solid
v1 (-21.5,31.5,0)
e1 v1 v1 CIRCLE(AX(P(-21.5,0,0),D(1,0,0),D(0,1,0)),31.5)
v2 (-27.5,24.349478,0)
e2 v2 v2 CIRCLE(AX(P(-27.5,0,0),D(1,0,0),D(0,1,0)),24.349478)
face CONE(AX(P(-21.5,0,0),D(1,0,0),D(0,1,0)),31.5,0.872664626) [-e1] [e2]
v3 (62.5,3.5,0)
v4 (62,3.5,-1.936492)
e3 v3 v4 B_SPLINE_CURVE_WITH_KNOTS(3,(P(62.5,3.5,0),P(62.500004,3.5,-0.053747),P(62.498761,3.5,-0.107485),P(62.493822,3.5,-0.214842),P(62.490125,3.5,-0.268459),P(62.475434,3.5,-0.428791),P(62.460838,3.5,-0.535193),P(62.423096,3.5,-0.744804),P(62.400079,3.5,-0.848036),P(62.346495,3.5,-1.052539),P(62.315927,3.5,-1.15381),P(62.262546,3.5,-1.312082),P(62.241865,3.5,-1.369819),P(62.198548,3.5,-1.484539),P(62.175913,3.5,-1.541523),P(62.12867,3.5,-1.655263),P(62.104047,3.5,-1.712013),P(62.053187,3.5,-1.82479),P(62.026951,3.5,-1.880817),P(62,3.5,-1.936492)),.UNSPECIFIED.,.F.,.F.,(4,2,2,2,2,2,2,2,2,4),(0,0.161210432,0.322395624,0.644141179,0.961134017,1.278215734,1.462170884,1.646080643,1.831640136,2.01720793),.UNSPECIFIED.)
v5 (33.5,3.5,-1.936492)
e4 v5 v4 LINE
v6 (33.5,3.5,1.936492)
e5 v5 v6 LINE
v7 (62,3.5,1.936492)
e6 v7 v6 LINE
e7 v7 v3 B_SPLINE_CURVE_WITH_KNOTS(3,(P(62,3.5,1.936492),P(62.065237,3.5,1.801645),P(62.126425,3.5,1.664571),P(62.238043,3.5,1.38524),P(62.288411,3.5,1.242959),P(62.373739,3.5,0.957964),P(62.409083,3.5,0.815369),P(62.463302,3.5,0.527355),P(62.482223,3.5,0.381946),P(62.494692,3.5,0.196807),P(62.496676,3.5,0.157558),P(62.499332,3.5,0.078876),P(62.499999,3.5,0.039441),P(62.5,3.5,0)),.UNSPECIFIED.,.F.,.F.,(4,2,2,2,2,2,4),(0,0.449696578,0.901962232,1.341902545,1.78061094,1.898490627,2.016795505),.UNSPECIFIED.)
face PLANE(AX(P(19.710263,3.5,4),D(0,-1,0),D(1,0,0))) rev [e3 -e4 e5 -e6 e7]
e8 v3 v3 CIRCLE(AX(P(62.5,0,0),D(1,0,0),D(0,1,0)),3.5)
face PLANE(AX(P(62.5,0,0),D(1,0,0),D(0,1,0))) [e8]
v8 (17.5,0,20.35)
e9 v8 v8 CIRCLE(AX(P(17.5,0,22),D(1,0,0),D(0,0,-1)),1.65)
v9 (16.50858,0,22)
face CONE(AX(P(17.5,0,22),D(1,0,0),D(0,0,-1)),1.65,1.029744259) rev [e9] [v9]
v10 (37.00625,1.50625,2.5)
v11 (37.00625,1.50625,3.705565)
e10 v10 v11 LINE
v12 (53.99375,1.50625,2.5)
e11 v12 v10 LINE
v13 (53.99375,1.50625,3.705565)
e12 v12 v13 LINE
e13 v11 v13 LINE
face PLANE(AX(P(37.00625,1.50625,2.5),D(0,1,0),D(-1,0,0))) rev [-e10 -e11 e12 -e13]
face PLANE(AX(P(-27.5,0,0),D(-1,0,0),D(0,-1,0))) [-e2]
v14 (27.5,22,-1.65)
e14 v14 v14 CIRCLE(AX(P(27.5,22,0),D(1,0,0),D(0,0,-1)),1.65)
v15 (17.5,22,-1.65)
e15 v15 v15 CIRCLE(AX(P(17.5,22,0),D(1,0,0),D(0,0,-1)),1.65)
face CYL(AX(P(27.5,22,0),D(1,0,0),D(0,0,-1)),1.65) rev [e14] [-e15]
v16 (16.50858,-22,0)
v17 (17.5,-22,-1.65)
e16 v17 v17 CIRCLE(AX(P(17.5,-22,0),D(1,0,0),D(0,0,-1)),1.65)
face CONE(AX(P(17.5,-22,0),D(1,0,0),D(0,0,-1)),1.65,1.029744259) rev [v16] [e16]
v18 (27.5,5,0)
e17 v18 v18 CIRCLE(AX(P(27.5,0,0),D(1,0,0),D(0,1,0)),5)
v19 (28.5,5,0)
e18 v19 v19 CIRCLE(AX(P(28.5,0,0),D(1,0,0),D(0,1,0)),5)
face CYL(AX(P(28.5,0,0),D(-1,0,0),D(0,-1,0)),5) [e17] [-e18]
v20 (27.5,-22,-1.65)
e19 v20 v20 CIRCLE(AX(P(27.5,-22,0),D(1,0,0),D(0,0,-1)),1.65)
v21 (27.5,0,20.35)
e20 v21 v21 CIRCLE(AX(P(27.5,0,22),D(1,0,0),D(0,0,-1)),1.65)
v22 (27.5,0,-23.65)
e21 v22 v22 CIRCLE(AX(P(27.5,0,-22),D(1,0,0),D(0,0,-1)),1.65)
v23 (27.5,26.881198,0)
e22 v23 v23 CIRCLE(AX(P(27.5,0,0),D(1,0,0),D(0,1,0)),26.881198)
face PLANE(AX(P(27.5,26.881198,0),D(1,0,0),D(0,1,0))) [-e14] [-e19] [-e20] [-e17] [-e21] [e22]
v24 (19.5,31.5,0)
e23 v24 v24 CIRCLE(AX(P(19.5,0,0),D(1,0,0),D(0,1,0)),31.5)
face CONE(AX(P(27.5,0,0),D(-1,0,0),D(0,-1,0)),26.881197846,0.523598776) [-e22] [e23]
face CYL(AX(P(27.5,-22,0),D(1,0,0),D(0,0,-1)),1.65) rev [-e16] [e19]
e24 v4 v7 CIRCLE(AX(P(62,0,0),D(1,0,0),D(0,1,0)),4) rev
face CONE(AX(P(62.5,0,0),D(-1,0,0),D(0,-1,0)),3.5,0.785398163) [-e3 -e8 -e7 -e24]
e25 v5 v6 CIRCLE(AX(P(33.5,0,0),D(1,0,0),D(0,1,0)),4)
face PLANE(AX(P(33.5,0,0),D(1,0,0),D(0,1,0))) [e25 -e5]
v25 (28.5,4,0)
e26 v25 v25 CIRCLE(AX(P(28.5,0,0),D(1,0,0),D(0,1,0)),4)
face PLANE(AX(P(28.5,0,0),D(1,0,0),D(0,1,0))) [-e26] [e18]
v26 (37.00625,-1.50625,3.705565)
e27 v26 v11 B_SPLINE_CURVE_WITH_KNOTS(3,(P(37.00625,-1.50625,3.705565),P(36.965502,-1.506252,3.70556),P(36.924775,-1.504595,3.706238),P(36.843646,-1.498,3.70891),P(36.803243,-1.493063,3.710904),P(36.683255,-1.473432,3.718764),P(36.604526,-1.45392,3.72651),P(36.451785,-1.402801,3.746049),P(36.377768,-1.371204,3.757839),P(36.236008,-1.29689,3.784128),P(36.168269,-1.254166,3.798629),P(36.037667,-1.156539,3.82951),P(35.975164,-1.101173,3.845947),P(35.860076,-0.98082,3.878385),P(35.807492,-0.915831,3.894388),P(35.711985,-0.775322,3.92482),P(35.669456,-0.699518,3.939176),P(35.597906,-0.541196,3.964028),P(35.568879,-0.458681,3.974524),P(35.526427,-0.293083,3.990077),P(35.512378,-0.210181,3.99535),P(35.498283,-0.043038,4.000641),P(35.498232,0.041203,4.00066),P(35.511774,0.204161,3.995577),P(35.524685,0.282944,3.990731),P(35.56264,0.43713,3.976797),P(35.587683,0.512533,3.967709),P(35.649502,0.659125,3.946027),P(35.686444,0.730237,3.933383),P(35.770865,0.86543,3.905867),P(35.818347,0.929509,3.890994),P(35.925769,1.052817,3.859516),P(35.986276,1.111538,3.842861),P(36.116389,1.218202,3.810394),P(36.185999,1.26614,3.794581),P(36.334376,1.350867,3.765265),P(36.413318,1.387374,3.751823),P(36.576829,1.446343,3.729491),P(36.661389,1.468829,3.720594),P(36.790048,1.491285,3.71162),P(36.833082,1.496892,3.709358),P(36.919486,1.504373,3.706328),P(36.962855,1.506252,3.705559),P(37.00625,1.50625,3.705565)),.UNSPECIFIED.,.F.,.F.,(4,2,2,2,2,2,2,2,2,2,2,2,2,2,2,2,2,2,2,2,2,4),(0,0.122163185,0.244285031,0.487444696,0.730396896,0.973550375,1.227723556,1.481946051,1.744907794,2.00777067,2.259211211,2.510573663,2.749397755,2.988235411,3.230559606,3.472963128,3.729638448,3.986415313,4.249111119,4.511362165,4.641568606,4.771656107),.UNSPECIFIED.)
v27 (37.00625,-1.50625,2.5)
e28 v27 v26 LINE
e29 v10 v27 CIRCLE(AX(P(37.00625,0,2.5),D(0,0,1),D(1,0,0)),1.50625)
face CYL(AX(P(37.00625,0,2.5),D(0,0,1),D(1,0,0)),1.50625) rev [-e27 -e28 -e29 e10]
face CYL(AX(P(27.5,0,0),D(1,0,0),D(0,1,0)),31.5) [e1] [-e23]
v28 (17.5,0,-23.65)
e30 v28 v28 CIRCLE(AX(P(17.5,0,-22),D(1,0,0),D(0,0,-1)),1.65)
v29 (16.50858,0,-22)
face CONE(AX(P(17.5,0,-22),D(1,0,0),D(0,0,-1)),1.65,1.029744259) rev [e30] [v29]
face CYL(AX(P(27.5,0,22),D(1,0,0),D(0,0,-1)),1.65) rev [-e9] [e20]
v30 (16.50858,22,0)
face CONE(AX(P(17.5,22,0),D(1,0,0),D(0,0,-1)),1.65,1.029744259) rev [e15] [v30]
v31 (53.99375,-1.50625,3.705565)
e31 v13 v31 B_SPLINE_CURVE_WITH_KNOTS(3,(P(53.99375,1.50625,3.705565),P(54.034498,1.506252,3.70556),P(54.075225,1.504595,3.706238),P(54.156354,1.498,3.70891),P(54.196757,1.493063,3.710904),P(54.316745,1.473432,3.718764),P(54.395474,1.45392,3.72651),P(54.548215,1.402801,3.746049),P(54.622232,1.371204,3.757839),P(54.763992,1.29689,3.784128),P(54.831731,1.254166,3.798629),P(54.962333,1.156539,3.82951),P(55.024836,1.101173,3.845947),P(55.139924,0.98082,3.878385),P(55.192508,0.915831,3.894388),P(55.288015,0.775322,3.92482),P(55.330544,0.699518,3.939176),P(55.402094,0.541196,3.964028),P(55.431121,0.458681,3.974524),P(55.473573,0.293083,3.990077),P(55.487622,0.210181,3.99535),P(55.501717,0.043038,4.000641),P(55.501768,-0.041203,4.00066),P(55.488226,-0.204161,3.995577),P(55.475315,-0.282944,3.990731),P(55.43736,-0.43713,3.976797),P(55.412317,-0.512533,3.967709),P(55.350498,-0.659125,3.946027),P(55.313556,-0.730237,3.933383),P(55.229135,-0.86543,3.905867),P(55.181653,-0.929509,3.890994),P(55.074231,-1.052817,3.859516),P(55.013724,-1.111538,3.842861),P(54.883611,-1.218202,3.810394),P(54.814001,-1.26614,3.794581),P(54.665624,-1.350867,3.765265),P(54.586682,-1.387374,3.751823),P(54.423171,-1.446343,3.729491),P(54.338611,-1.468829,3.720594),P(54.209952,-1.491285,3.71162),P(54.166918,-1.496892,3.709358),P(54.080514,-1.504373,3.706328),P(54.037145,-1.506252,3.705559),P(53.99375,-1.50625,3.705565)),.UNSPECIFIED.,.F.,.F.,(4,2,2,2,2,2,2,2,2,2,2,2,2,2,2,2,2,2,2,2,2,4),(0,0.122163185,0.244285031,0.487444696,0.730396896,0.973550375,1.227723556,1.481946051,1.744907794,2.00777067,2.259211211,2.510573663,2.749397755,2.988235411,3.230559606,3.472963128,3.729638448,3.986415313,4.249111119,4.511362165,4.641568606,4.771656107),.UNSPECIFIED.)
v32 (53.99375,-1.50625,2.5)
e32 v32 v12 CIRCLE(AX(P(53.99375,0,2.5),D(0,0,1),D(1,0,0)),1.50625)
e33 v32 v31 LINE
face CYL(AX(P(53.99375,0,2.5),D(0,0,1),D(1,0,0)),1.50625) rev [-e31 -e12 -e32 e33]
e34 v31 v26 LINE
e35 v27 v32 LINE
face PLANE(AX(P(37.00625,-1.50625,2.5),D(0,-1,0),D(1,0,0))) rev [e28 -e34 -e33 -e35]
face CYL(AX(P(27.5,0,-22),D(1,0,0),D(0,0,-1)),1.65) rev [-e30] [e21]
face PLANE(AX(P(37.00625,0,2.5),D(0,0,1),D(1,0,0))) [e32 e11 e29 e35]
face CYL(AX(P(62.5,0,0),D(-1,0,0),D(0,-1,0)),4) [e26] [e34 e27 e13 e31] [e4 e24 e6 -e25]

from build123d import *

# Parameters (mm, degrees)
SKIZZE2_R                       = 5
SKIZZE2_R_2                     = 4
AUFSATZ_LINEAR_AUSTRAGEN1_DEPTH = 1
SKIZZE2_2_R                     = 4
AUFSATZ_LINEAR_AUSTRAGEN2_DEPTH = 35
M4_GEWINDEBOHRUNG1_D            = 3.3
M4_GEWINDEBOHRUNG1_DEPTH        = 10
M4_GEWINDEBOHRUNG1_TIP          = 0.991420021
SCHNITT_LINEAR_AUSTRAGEN1_DEPTH = 1.5
SKIZZE7_W                       = 8
SKIZZE7_H                       = 3.641356754
SCHNITT_LINEAR_AUSTRAGEN2_DEPTH = 29
FASE1_SIZE                      = 0.5


with BuildPart() as part:
    # Skizze1 → Rotation1 (revolve)
    with BuildSketch(Plane.XY):
        Polygon((27.5, 0), (-27.5, 0), (-27.5, 24.349478444), (-21.5, 31.5), (19.5, 31.5), (27.5, 26.881197846), align=None)
    revolve(axis=Axis((27.5, 0, 0), (-1, 0, 0)))

    # Skizze2 → Aufsatz-Linear austragen1 (add)
    with BuildSketch(Plane(origin=(27.5, 0, 0), x_dir=(0, 0, -1), z_dir=(1, 0, 0))):
        with Locations(Location((0, 0, 0), (0, 0, 90))):
            Circle(SKIZZE2_R)
        with Locations(Location((0, 0, 0), (0, 0, 90))):
            Circle(SKIZZE2_R_2, mode=Mode.SUBTRACT)
    extrude(amount=AUFSATZ_LINEAR_AUSTRAGEN1_DEPTH)

    # Skizze2<2> → Aufsatz-Linear austragen2 (add)
    with BuildSketch(Plane(origin=(27.5, 0, 0), x_dir=(0, 0, -1), z_dir=(1, 0, 0))):
        with Locations(Location((0, 0, 0), (0, 0, 90))):
            Circle(SKIZZE2_2_R)
    extrude(amount=AUFSATZ_LINEAR_AUSTRAGEN2_DEPTH)

    # M4 Gewindebohrung1
    with Locations(Plane(origin=(27.5, 0, 0), x_dir=(0, 0, -1), z_dir=(1, 0, 0))):
        with Locations((0, 22), (0, -22), (22, 0), (-22, 0)):
            Hole(M4_GEWINDEBOHRUNG1_D / 2, depth=M4_GEWINDEBOHRUNG1_DEPTH)
            with Locations((0, 0, -(M4_GEWINDEBOHRUNG1_DEPTH + M4_GEWINDEBOHRUNG1_TIP / 2))):  # 118° drill point
                Cone(0, M4_GEWINDEBOHRUNG1_D / 2, M4_GEWINDEBOHRUNG1_TIP, mode=Mode.SUBTRACT)

    # Skizze6 → Schnitt-Linear austragen1 (cut)
    with BuildSketch(Plane.XY.offset(4)):
        with BuildLine():
            Line((37.00625, 1.50625), (53.99375, 1.50625))
            ThreePointArc((53.99375, 1.50625), (55.5, 0), (53.99375, -1.50625))
            Line((53.99375, -1.50625), (37.00625, -1.50625))
            ThreePointArc((37.00625, -1.50625), (35.5, 0), (37.00625, 1.50625))
        make_face()
    extrude(amount=-SCHNITT_LINEAR_AUSTRAGEN1_DEPTH, mode=Mode.SUBTRACT)

    # Skizze7 → Schnitt-Linear austragen2 (cut)
    with BuildSketch(Plane(origin=(62.5, 0, 0), x_dir=(0, 0, -1), z_dir=(1, 0, 0))):
        with Locations((0, 5.320678377)):
            Rectangle(SKIZZE7_W, SKIZZE7_H)
    extrude(amount=-SCHNITT_LINEAR_AUSTRAGEN2_DEPTH, mode=Mode.SUBTRACT)

    # Fase1
    fase1_edges = [part.edges().sort_by_distance(p)[0] for p in [
        (62.5, -4, 0),
    ]]
    chamfer(fase1_edges, length=FASE1_SIZE - 0.0001)  # a hair under: the kernel refuses the full size


solid = part.part
